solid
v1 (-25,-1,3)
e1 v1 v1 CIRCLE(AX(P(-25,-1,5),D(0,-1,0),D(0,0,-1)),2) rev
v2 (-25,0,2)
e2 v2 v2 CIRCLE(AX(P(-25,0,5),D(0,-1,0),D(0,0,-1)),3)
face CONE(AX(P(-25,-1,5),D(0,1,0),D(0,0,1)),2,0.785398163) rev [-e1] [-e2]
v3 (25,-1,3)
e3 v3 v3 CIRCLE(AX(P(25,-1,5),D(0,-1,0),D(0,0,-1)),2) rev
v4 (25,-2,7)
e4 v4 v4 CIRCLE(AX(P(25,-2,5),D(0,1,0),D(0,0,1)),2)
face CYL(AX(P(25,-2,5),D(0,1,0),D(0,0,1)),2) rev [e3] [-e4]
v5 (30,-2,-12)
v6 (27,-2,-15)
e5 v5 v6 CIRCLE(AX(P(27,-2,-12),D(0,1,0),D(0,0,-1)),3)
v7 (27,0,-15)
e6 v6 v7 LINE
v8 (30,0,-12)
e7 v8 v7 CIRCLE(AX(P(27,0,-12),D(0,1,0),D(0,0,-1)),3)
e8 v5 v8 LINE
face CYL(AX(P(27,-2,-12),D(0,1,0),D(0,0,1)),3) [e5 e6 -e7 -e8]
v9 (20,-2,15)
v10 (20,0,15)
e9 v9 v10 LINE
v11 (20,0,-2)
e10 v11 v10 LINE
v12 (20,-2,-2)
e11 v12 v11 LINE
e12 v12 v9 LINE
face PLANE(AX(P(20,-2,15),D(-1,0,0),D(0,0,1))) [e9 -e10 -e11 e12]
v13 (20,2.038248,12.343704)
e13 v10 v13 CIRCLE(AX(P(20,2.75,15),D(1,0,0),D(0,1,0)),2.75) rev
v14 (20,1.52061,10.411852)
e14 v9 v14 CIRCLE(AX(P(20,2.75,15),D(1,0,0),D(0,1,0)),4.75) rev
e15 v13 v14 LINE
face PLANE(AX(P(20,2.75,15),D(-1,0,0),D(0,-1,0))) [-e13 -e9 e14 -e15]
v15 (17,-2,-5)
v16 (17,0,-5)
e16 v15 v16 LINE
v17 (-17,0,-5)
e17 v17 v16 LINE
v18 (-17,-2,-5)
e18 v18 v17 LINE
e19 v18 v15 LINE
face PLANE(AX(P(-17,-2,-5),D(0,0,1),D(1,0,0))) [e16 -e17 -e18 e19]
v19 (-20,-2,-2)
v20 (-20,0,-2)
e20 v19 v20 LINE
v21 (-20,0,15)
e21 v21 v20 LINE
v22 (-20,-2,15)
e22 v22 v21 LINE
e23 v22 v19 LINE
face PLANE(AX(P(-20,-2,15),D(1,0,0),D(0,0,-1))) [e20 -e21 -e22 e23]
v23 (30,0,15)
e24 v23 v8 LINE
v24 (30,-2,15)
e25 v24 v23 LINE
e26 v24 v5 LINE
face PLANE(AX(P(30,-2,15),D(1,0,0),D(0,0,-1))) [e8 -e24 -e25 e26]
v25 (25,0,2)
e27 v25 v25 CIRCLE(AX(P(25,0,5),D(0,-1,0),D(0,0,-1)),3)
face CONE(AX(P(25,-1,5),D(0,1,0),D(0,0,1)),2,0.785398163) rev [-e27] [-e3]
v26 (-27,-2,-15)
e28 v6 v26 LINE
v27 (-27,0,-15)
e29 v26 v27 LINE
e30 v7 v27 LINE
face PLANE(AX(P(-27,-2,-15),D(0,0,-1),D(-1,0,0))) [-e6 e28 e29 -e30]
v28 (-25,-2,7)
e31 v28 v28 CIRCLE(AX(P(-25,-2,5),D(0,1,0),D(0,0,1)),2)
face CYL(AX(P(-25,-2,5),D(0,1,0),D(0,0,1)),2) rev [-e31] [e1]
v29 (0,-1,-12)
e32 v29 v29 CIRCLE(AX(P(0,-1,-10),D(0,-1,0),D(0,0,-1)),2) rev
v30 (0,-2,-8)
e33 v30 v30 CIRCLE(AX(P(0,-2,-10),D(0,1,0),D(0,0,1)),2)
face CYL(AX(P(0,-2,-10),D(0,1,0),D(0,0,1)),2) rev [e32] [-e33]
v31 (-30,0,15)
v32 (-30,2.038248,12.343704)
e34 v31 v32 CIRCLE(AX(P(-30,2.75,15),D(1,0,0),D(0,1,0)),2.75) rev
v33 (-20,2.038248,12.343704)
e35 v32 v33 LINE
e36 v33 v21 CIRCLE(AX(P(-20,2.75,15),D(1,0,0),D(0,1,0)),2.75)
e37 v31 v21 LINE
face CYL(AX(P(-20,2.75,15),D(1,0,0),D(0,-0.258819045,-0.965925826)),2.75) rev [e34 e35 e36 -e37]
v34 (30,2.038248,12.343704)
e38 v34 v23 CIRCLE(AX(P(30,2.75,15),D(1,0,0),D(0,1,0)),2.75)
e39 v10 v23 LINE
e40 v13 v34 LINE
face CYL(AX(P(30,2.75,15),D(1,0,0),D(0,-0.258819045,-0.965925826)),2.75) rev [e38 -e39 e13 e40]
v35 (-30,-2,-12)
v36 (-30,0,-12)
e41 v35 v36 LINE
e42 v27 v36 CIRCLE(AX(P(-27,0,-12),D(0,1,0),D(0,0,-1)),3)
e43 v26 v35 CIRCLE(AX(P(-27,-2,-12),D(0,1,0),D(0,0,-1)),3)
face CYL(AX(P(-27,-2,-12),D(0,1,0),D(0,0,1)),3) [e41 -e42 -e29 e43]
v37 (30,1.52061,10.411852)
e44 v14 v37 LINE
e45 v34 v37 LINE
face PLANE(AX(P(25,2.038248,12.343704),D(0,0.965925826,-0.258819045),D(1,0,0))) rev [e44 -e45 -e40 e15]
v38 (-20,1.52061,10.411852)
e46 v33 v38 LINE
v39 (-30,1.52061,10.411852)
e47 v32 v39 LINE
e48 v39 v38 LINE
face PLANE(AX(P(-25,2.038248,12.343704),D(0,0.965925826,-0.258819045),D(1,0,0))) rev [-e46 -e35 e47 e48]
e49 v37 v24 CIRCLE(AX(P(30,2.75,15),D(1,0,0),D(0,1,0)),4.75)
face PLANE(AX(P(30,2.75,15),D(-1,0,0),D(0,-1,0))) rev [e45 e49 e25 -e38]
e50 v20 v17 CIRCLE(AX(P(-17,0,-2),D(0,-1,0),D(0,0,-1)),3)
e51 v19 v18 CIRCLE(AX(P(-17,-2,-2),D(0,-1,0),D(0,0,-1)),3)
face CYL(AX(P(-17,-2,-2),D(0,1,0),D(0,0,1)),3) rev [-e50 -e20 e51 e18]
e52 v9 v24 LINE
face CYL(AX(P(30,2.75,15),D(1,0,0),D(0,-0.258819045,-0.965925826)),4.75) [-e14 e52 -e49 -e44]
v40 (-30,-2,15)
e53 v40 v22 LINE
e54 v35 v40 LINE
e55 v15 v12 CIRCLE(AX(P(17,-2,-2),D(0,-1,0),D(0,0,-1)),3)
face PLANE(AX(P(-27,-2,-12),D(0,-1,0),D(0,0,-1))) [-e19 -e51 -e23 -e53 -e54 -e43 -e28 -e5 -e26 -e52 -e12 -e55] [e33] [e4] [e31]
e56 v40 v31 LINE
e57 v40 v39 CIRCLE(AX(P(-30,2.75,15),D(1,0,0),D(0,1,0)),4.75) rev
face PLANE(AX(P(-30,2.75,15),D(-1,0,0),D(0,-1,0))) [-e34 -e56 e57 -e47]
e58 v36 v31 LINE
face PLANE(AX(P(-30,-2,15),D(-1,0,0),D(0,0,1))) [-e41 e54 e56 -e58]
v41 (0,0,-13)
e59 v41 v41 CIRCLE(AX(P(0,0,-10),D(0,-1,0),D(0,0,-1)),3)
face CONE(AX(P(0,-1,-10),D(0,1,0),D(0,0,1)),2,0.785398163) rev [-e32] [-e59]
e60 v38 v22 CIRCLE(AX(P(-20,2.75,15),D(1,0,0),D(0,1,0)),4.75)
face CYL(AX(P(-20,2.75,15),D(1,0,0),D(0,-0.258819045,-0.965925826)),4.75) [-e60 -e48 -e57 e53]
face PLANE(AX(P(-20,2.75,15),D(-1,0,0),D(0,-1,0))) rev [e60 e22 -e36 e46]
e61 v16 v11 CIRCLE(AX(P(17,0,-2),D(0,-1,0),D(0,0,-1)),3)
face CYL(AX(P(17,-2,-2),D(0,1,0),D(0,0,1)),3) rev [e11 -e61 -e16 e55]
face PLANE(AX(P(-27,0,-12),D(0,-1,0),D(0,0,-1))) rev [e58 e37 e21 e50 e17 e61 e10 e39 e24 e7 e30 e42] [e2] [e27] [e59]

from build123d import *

# Parameters (mm, degrees)
BASE_FLANGE1_DEPTH = 2
HEM1_START         = -30
HEM1_DEPTH         = 10
HEM1_START_2       = 20
HEM1_2_DEPTH       = 10
SKETCH14_R         = 2
CUT_EXTRUDE1_DEPTH = 10
CHAMFER1_SIZE      = 1


# Read off the part's stored shape, not the designer's step: Hem1
# Sheet-metal steps are written as plain solids
with BuildPart() as part:
    # Sketch1 → Base-Flange1 (new body)
    with BuildSketch(Plane(origin=(0, 0, 0), x_dir=(1, 0, 0), z_dir=(0, 1, 0))):
        with BuildLine():
            Line((20, -15), (30, -15))
            Line((30, -15), (30, 12))
            ThreePointArc((30, 12), (29.121320344, 14.121320344), (27, 15))
            Line((27, 15), (-27, 15))
            ThreePointArc((-27, 15), (-29.121320344, 14.121320344), (-30, 12))
            Line((-30, 12), (-30, -15))
            Line((-30, -15), (-20, -15))
            Line((-20, -15), (-20, 2))
            ThreePointArc((-20, 2), (-19.121320344, 4.121320344), (-17, 5))
            Line((-17, 5), (17, 5))
            ThreePointArc((17, 5), (19.121320344, 4.121320344), (20, 2))
            Line((20, 2), (20, -15))
        make_face()
    extrude(amount=-BASE_FLANGE1_DEPTH)

    # Hem1 outline → Hem1 (add)
    with BuildSketch(Plane.YZ.offset(HEM1_START)):
        with BuildLine():
            Line((2.038247626, 12.343703978), (1.520609536, 10.411852325))
            ThreePointArc((1.520609536, 10.411852325), (6.518428366, 17.891616788), (-2, 15))
            Line((-2, 15), (0, 15))
            ThreePointArc((0, 15), (4.931721686, 16.67409393), (2.038247626, 12.343703978))
        make_face()
    extrude(amount=HEM1_DEPTH)

    # Hem1 2 outline → Hem1 2 (add)
    with BuildSketch(Plane.YZ.offset(HEM1_START_2)):
        with BuildLine():
            Line((2.038247626, 12.343703978), (1.520609536, 10.411852325))
            ThreePointArc((1.520609536, 10.411852325), (6.518428366, 17.891616788), (-2, 15))
            Line((-2, 15), (0, 15))
            ThreePointArc((0, 15), (4.931721686, 16.67409393), (2.038247626, 12.343703978))
        make_face()
    extrude(amount=HEM1_2_DEPTH)

    # Sketch14 → Cut-Extrude1 (cut)
    with BuildSketch(Plane(origin=(0, 0, 0), x_dir=(1, 0, 0), z_dir=(0, 1, 0))):
        with Locations(Location((0, 10, 0), (0, 0, 270))):
            Circle(SKETCH14_R)
        with Locations(Location((-25, -5, 0), (0, 0, 270))):
            Circle(SKETCH14_R)
        with Locations(Location((25, -5, 0), (0, 0, 270))):
            Circle(SKETCH14_R)
    extrude(amount=-CUT_EXTRUDE1_DEPTH, mode=Mode.SUBTRACT)

    # Chamfer1
    chamfer1_edges = [part.edges().sort_by_distance(p)[0] for p in [
        (0, 0, -12),
        (-25, 0, 3),
        (25, 0, 3),
    ]]
    chamfer(chamfer1_edges, length=CHAMFER1_SIZE)


solid = part.part
